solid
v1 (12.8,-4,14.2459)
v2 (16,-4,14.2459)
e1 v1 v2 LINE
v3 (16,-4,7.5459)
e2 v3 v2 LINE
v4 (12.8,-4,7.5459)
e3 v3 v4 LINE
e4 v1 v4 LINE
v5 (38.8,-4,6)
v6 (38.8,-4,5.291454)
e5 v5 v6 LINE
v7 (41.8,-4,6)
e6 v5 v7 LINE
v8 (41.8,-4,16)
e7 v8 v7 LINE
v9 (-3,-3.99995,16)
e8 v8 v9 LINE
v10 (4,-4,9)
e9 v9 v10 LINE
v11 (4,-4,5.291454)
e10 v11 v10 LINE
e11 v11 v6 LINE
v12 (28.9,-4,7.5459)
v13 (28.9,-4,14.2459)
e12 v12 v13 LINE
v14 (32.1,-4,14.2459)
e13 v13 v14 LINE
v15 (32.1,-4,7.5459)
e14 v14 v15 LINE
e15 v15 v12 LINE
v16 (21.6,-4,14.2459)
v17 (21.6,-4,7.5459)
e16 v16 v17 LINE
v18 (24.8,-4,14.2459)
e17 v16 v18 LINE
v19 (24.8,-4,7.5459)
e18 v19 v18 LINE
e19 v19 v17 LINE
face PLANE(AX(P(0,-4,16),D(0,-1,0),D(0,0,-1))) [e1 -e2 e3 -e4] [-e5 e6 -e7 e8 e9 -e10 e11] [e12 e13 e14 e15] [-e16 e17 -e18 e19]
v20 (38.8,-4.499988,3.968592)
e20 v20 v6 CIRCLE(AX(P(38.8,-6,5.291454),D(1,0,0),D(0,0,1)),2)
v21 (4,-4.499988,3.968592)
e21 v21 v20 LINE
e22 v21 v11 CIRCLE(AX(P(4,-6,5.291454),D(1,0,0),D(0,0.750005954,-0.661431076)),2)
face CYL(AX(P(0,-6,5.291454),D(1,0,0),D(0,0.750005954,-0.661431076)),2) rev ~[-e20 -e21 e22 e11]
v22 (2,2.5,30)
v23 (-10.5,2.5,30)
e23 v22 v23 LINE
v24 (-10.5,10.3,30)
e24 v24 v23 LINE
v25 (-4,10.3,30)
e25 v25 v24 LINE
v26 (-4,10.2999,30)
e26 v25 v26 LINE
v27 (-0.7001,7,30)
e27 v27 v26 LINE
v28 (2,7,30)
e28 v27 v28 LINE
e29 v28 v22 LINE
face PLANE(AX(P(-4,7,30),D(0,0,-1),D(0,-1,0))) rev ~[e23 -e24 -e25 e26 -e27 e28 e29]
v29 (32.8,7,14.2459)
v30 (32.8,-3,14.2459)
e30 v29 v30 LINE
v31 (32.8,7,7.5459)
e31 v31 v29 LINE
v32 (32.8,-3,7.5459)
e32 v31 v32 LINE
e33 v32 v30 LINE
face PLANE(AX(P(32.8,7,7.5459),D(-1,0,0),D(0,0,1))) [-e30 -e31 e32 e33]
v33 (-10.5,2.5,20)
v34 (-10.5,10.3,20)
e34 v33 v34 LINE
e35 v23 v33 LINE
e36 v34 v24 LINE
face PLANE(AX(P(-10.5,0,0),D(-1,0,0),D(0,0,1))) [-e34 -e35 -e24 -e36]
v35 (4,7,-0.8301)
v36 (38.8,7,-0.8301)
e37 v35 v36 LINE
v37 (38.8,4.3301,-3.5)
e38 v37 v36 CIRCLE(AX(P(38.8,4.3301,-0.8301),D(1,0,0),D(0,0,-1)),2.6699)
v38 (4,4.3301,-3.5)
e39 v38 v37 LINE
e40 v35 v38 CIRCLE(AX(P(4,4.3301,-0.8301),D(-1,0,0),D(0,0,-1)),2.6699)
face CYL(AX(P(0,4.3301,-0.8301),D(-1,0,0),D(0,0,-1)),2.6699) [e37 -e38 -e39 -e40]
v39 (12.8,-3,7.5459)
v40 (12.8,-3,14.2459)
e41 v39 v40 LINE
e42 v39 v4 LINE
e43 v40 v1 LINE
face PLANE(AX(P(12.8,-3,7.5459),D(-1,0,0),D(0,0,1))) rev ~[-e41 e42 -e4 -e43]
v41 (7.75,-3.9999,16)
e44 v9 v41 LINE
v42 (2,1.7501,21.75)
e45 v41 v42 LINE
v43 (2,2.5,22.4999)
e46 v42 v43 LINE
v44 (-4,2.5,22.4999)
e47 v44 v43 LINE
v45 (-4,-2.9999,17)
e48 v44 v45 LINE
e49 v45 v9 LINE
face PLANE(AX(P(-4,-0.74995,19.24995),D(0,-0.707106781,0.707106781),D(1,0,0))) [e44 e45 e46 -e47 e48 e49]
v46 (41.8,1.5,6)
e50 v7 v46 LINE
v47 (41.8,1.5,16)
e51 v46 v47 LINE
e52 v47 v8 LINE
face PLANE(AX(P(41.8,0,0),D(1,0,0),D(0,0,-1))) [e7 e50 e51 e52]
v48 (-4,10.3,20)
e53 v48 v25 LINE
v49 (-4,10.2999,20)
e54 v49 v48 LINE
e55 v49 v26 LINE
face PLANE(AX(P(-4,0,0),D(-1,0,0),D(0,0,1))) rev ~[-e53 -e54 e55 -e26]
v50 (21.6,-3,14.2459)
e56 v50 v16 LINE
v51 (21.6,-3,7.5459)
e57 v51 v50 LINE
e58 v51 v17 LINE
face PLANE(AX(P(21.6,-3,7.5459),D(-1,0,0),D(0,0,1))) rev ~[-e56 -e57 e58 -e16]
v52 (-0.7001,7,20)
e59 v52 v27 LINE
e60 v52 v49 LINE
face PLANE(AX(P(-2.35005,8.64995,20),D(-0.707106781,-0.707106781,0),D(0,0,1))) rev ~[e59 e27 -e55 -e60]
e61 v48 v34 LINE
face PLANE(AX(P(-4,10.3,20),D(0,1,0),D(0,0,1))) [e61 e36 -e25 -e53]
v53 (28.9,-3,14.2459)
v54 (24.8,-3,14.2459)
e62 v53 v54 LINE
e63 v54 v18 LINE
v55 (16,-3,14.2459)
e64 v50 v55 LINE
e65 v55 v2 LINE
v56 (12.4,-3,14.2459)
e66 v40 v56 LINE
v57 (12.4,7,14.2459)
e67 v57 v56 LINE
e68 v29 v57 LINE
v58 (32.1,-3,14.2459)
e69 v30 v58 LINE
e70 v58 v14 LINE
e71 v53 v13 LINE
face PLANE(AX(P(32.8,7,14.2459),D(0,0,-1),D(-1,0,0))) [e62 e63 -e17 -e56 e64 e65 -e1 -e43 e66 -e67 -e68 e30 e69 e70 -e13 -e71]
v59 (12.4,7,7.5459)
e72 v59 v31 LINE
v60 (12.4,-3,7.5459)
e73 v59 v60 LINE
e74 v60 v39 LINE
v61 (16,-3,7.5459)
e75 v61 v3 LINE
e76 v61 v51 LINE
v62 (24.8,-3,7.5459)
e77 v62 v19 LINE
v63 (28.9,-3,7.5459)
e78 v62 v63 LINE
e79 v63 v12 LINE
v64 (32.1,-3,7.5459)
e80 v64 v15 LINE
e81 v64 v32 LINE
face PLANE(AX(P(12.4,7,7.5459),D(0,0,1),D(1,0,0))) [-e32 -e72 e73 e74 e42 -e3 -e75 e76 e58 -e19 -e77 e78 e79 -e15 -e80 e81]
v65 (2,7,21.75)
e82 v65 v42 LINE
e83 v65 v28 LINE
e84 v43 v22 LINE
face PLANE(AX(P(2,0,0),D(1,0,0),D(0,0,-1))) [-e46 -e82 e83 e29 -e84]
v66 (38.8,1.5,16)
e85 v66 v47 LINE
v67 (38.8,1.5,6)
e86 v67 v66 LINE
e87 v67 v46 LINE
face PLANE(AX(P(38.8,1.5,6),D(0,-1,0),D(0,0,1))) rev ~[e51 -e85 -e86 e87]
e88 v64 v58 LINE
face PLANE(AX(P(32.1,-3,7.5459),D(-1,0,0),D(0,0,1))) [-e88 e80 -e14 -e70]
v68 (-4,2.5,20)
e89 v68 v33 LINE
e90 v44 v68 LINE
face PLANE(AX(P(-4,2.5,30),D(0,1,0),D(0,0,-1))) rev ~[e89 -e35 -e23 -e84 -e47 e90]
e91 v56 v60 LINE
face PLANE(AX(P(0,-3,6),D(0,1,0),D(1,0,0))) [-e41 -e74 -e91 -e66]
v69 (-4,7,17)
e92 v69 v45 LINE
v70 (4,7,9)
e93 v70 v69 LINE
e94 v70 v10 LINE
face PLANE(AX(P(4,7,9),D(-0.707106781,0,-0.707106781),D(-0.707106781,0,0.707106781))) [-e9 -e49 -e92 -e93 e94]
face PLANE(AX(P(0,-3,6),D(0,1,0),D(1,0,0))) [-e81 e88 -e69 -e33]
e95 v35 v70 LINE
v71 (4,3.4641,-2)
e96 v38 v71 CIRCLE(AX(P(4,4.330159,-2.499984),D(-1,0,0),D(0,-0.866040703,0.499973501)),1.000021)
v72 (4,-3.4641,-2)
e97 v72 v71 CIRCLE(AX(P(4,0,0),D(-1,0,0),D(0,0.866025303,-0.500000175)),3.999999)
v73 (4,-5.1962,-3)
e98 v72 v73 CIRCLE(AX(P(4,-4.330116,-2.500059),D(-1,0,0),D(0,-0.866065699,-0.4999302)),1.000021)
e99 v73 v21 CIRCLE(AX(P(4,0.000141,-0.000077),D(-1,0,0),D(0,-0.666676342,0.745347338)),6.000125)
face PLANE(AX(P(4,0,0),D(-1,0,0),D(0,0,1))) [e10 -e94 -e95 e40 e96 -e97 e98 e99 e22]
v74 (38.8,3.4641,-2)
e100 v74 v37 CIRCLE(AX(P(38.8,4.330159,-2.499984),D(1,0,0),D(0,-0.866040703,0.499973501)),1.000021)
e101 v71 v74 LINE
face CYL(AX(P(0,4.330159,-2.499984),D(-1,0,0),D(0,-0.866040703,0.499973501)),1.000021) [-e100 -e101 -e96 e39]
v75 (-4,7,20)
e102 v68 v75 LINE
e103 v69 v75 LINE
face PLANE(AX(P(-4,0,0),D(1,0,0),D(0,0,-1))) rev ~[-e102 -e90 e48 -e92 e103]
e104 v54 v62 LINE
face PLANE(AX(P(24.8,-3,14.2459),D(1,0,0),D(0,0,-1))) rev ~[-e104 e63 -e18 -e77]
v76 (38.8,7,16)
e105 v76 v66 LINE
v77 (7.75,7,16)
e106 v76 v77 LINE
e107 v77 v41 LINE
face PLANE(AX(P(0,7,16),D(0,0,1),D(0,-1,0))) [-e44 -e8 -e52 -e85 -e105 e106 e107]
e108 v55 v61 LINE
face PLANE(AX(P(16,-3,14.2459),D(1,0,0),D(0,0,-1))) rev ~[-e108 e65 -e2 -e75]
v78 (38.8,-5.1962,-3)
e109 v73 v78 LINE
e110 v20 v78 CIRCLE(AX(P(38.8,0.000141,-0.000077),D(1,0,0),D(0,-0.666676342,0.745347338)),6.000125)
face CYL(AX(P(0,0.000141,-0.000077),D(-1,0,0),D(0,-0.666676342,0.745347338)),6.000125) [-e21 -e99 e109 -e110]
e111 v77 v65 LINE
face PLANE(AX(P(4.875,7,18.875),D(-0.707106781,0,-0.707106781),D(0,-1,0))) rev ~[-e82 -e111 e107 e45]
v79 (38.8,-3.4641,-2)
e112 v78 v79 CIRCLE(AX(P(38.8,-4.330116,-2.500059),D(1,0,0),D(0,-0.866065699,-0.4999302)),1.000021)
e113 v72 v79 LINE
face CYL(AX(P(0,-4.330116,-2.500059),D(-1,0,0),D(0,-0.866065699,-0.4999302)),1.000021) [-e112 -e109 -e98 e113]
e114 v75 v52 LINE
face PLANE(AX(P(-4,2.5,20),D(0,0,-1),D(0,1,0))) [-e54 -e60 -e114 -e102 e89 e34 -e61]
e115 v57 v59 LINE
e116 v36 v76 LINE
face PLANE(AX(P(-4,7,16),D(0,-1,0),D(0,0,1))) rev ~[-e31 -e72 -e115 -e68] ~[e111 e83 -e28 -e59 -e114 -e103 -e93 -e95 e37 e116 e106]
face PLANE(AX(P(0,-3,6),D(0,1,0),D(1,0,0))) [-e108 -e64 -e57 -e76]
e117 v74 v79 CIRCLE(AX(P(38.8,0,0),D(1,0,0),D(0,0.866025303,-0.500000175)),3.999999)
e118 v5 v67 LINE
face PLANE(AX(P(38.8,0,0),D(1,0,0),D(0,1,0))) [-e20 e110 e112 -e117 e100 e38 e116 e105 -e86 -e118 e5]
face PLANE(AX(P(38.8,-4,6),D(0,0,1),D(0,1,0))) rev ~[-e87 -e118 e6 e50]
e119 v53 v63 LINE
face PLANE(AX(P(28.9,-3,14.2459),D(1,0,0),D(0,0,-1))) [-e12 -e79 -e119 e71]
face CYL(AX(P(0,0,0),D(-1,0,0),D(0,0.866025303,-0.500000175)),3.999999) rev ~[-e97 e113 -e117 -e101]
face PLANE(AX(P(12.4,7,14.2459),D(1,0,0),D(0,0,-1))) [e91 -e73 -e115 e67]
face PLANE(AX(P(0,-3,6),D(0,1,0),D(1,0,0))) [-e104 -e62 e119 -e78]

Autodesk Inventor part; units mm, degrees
ref_plane "YZ Plane" through (0, 0, 0) normal (1, 0, 0) x (0, 1, 0)
ref_plane "XZ Plane" through (0, 0, 0) normal (0, 1, 0) x (-1, 0, 0)
ref_plane "XY Plane" through (0, 0, 0) normal (0, 0, 1) x (1, 0, 0)
sketch "Sketch1" plane through (0, 0, 0) normal (1, 0, 0) x (0, 1, 0)
  arc A0 (3.4641, -2) -> (-3.4641, -2) centre (0, 0) ccw
  arc A1 (3.4641, -2) -> (5.1962, -3) centre (4.3301, -2.5) ccw
  arc A2 (-5.1962, -3) -> (-3.4641, -2) centre (-4.3301, -2.5) ccw
  line L0 (7, 16) -> (-4, 16)
  line L1 (-4, 16) -> (-4, 4.4721)
  line L2 (4.4721, 4) -> (7, 4)
  line L3 (7, 4) -> (7, 16)
  arc A3 (5.1962, -3) -> (5.8413, 1.3709) centre (0, 0) ccw
  arc A4 (-4, 4.4721) -> (-5.1962, -3) centre (0, 0) ccw
  line L4 (7, 4) -> (7, -0.8301)
  arc A5 (4.3301, -3.5) -> (7, -0.8301) centre (4.3301, -0.8301) ccw
  dimension "d0" = 8
  dimension "d4" = 2.5
  dimension "d5" = 7
  dimension "d6" = 12
  dimension "d7" = 11
  dimension "d34" = 6
  dimension "d35" = 6
extrude "Extrusion1" add sketch "Sketch1" along normal blind 38.8
fillet "Fillet1" radius 2 1 edges at (19.4, -4, 4.4721)
sketch "Sketch2" plane through (38.8, 0, 0) normal (1, 0, 0) x (0, 0, -1)
  line L0 (-16, -4) -> (-5.2915, -4) projected
  line L1 (-16, -4) -> (-6, -4)
  line L2 (-6, -4) -> (-6, 1.5)
  line L3 (-6, 1.5) -> (-16, 1.5)
  line L4 (-16, 1.5) -> (-16, -4)
  point P0 (0, 0)
  dimension "d11" = 10
  dimension "d12" = 5.5
extrude "Extrusion2" add sketch "Sketch2" along normal blind 3
sketch "Sketch3" plane through (0, 0, 0) normal (-1, 0, 0) x (0, 0, 1)
  point P0 (0, 0)
sketch "Sketch4" plane through (0, 0, 0) normal (-1, 0, 0) x (0, 0, 1)
  line L0 (16, -4) -> (6, -4)
  line L1 (6, -4) -> (6, 7)
  line L2 (6, 7) -> (16, 7)
  line L3 (16, 7) -> (16, -4)
  point P0 (0, 0)
  dimension "d15" = 10
  dimension "d16" = 11
extrude "Extrusion3" add sketch "Sketch4" along normal blind 4
sketch "Sketch8" plane through (-4, 0, 0) normal (-1, 0, 0) x (0, 0, 1)
  line L0 (20, 10.3) -> (30, 10.3)
  line L1 (30, 10.3) -> (30, 2.5)
  line L2 (30, 2.5) -> (20, 2.5)
  line L3 (20, 2.5) -> (20, 10.3)
  point P0 (0, 0)
  dimension "d26" = 7.8
  dimension "d27" = 10.3
  dimension "d28" = 20
  dimension "d29" = 10
extrude "Extrusion6" add sketch "Sketch8" along normal blind 6.5
sketch "Sketch9" plane through (-4, 0, 0) normal (1, 0, 0) x (0, 0, -1)
  line L0 (-30, 2.5) -> (-20, 2.5) projected
  line L1 (-16, 7) -> (-16, 1.5) projected
  line L2 (-30, 2.5) -> (-16, 2.5)
  line L3 (-16, 2.5) -> (-16, 7)
  line L4 (-16, 7) -> (-30, 7)
  line L5 (-30, 7) -> (-30, 2.5)
  point P0 (0, 0)
extrude "Extrusion7" add sketch "Sketch9" along normal blind 6
sketch "Sketch11" plane through (0, 7, 6) normal (0, 1, 0) x (1, 0, 0)
  line L0 (32.8, -8.2459) -> (12.4, -8.2459)
  line L1 (12.4, -8.2459) -> (12.4, -1.5459)
  line L2 (12.4, -1.5459) -> (32.8, -1.5459)
  line L3 (32.8, -1.5459) -> (32.8, -8.2459)
  line L4 (38.8, 6.8301) -> (38.8, -10) projected
  point P0 (0, 6)
  point P1 (38.8, 2)
  dimension "d47" = 20.4
  dimension "d48" = 6.7
  dimension "d67" = 6
extrude "Extrusion9" cut sketch "Sketch11" against normal blind 10
sketch "Sketch12" plane through (0, -3, 6) normal (0, 1, 0) x (1, 0, 0)
  line L0 (11.9901, -47.107) -> (11.9901, -26.707)
  line L1 (18.6901, -26.707) -> (18.6901, -47.107)
  line L2 (11.9901, -46.407) -> (18.6901, -46.407)
  line L3 (18.6901, -46.407) -> (18.6901, -43.207)
  line L4 (18.6901, -43.207) -> (11.9901, -43.207)
  line L5 (11.9901, -43.207) -> (11.9901, -46.407)
  line L6 (11.9901, -39.107) -> (18.6901, -39.107)
  line L7 (18.6901, -39.107) -> (18.6901, -35.907)
  line L8 (18.6901, -35.907) -> (11.9901, -35.907)
  line L9 (11.9901, -35.907) -> (11.9901, -39.107)
  line L10 (11.9901, -30.307) -> (18.6901, -30.307)
  line L11 (18.6901, -30.307) -> (18.6901, -27.107)
  line L12 (18.6901, -27.107) -> (11.9901, -27.107)
  line L13 (11.9901, -27.107) -> (11.9901, -30.307)
  line L14 (18.6901, -47.107) -> (11.9901, -47.107)
  line L15 (11.9901, -26.707) -> (18.6901, -26.707)
  line L16 (32.8, -8.2459) -> (12.4, -8.2459) projected
  line L17 (12.4, -1.5459) -> (32.8, -1.5459) projected
  line L18 (12.8, -8.2459) -> (16, -8.2459)
  line L19 (16, -8.2459) -> (16, -1.5459)
  line L20 (16, -1.5459) -> (12.8, -1.5459)
  line L21 (12.8, -1.5459) -> (12.8, -8.2459)
  line L22 (21.6, -8.2459) -> (24.8, -8.2459)
  line L23 (24.8, -8.2459) -> (24.8, -1.5459)
  line L24 (24.8, -1.5459) -> (21.6, -1.5459)
  line L25 (21.6, -1.5459) -> (21.6, -8.2459)
  line L26 (32.1, -8.2459) -> (28.9, -8.2459)
  line L27 (28.9, -8.2459) -> (28.9, -1.5459)
  line L28 (28.9, -1.5459) -> (32.1, -1.5459)
  line L29 (32.1, -1.5459) -> (32.1, -8.2459)
  line L30 (12.4, -8.2459) -> (12.4, -1.5459) projected
  point P0 (0, 6)
  point P1 (15.3401, -24.907)
  point P2 (11.9901, -44.807)
  point P3 (11.9901, -37.507)
  point P4 (11.9901, -28.707)
  point P5 (14.4, -8.2459)
  point P6 (23.2, -8.2459)
  point P7 (30.5, -8.2459)
  dimension "d51" = 7.3
  dimension "d52" = 8.8
  dimension "d53" = 3.2
  dimension "d54" = 3.2
  dimension "d55" = 3.2
  dimension "d56" = 2
  dimension "d59" = 3.2
  dimension "d60" = 3.2
  dimension "d61" = 3.2
  dimension "d62" = 8.8
  dimension "d63" = 7.3
  dimension "d64" = 2
extrude "Extrusion10" cut sketch "Sketch12" against normal blind 10 contours L16 L27 L17 L29 | L16 L25 L17 L23 | L16 L21 L17 L19
sketch "Sketch13" plane through (0, 0, 0) normal (-1, 0, 0) x (0, 0, 1)
  line L0 (-8.6099, 16.8376) -> (10, 16.8376)
  line L1 (10, -12.4202) -> (-8.6099, -12.4202)
  line L2 (-8.6099, -12.4202) -> (-8.6099, 16.8376)
  line L3 (10, 16.8376) -> (10, -12.4202)
  line L4 (16, -4) -> (16, 2.5) projected
  point P0 (0, 0)
  point P1 (16, 0.5)
  dimension "d70" = 6
extrude "Extrusion11" cut sketch "Sketch13" along normal mid plane 8
chamfer "Chamfer1" distance 4 angle 45 2 edges at (4, 1.5, 10) (-4, 1.5, 10)
chamfer "Chamfer2" distance 5.75 angle 45 1 edges at (2, 4.75, 16)
chamfer "Chamfer3" distance 3.3 angle 45 1 edges at (-4, 7, 25)
chamfer "Chamfer4" distance 6.5 angle 45 2 edges at (4.875, 2.5, 16) (-1, 2.5, 16)
sketch "Sketch14" plane through (38.8, 7, 16) normal (0, 1, 0) x (1, 0, 0)
  line L0 (-34.8, 10) -> (-34.8, 10.7085) projected
  line L1 (-34.8, 10) -> (-34.8, 7)
  line L2 (-34.8, 7) -> (-42.8, -1)
  line L3 (-42.8, 2) -> (-42.8, -4) projected
  line L4 (-42.8, 2) -> (-34.8, 10) projected
  line L5 (-42.8, 2) -> (-42.8, -1)
  line L6 (-42.8, 2) -> (-34.8, 10)
  line L7 (-42.8, -4) -> (-49.3, -4) projected
  point P0 (-38.8, 16)
  dimension "d85" = 3
extrude "Extrusion12" cut sketch "Sketch14" against normal blind 15
sketch "Sketch15" plane through (-10.5, 2.5, 30) normal (0, 0, 1) x (1, 0, 0)
  line L0 (0, 0) -> (12.5, 0) projected
  line L1 (6.5, -2.5) -> (6.5, -5.5) projected
  line L2 (0, 0) -> (6.5, 0)
  line L3 (6.5, 0) -> (6.5, -5.5)
  line L4 (6.5, -5.5) -> (0, -5.5)
  line L5 (0, -5.5) -> (0, 0)
  point P0 (10.5, -2.5)
extrude "Extrusion13" cut sketch "Sketch15" against normal blind 30.25
properties part number "30_Switch"
